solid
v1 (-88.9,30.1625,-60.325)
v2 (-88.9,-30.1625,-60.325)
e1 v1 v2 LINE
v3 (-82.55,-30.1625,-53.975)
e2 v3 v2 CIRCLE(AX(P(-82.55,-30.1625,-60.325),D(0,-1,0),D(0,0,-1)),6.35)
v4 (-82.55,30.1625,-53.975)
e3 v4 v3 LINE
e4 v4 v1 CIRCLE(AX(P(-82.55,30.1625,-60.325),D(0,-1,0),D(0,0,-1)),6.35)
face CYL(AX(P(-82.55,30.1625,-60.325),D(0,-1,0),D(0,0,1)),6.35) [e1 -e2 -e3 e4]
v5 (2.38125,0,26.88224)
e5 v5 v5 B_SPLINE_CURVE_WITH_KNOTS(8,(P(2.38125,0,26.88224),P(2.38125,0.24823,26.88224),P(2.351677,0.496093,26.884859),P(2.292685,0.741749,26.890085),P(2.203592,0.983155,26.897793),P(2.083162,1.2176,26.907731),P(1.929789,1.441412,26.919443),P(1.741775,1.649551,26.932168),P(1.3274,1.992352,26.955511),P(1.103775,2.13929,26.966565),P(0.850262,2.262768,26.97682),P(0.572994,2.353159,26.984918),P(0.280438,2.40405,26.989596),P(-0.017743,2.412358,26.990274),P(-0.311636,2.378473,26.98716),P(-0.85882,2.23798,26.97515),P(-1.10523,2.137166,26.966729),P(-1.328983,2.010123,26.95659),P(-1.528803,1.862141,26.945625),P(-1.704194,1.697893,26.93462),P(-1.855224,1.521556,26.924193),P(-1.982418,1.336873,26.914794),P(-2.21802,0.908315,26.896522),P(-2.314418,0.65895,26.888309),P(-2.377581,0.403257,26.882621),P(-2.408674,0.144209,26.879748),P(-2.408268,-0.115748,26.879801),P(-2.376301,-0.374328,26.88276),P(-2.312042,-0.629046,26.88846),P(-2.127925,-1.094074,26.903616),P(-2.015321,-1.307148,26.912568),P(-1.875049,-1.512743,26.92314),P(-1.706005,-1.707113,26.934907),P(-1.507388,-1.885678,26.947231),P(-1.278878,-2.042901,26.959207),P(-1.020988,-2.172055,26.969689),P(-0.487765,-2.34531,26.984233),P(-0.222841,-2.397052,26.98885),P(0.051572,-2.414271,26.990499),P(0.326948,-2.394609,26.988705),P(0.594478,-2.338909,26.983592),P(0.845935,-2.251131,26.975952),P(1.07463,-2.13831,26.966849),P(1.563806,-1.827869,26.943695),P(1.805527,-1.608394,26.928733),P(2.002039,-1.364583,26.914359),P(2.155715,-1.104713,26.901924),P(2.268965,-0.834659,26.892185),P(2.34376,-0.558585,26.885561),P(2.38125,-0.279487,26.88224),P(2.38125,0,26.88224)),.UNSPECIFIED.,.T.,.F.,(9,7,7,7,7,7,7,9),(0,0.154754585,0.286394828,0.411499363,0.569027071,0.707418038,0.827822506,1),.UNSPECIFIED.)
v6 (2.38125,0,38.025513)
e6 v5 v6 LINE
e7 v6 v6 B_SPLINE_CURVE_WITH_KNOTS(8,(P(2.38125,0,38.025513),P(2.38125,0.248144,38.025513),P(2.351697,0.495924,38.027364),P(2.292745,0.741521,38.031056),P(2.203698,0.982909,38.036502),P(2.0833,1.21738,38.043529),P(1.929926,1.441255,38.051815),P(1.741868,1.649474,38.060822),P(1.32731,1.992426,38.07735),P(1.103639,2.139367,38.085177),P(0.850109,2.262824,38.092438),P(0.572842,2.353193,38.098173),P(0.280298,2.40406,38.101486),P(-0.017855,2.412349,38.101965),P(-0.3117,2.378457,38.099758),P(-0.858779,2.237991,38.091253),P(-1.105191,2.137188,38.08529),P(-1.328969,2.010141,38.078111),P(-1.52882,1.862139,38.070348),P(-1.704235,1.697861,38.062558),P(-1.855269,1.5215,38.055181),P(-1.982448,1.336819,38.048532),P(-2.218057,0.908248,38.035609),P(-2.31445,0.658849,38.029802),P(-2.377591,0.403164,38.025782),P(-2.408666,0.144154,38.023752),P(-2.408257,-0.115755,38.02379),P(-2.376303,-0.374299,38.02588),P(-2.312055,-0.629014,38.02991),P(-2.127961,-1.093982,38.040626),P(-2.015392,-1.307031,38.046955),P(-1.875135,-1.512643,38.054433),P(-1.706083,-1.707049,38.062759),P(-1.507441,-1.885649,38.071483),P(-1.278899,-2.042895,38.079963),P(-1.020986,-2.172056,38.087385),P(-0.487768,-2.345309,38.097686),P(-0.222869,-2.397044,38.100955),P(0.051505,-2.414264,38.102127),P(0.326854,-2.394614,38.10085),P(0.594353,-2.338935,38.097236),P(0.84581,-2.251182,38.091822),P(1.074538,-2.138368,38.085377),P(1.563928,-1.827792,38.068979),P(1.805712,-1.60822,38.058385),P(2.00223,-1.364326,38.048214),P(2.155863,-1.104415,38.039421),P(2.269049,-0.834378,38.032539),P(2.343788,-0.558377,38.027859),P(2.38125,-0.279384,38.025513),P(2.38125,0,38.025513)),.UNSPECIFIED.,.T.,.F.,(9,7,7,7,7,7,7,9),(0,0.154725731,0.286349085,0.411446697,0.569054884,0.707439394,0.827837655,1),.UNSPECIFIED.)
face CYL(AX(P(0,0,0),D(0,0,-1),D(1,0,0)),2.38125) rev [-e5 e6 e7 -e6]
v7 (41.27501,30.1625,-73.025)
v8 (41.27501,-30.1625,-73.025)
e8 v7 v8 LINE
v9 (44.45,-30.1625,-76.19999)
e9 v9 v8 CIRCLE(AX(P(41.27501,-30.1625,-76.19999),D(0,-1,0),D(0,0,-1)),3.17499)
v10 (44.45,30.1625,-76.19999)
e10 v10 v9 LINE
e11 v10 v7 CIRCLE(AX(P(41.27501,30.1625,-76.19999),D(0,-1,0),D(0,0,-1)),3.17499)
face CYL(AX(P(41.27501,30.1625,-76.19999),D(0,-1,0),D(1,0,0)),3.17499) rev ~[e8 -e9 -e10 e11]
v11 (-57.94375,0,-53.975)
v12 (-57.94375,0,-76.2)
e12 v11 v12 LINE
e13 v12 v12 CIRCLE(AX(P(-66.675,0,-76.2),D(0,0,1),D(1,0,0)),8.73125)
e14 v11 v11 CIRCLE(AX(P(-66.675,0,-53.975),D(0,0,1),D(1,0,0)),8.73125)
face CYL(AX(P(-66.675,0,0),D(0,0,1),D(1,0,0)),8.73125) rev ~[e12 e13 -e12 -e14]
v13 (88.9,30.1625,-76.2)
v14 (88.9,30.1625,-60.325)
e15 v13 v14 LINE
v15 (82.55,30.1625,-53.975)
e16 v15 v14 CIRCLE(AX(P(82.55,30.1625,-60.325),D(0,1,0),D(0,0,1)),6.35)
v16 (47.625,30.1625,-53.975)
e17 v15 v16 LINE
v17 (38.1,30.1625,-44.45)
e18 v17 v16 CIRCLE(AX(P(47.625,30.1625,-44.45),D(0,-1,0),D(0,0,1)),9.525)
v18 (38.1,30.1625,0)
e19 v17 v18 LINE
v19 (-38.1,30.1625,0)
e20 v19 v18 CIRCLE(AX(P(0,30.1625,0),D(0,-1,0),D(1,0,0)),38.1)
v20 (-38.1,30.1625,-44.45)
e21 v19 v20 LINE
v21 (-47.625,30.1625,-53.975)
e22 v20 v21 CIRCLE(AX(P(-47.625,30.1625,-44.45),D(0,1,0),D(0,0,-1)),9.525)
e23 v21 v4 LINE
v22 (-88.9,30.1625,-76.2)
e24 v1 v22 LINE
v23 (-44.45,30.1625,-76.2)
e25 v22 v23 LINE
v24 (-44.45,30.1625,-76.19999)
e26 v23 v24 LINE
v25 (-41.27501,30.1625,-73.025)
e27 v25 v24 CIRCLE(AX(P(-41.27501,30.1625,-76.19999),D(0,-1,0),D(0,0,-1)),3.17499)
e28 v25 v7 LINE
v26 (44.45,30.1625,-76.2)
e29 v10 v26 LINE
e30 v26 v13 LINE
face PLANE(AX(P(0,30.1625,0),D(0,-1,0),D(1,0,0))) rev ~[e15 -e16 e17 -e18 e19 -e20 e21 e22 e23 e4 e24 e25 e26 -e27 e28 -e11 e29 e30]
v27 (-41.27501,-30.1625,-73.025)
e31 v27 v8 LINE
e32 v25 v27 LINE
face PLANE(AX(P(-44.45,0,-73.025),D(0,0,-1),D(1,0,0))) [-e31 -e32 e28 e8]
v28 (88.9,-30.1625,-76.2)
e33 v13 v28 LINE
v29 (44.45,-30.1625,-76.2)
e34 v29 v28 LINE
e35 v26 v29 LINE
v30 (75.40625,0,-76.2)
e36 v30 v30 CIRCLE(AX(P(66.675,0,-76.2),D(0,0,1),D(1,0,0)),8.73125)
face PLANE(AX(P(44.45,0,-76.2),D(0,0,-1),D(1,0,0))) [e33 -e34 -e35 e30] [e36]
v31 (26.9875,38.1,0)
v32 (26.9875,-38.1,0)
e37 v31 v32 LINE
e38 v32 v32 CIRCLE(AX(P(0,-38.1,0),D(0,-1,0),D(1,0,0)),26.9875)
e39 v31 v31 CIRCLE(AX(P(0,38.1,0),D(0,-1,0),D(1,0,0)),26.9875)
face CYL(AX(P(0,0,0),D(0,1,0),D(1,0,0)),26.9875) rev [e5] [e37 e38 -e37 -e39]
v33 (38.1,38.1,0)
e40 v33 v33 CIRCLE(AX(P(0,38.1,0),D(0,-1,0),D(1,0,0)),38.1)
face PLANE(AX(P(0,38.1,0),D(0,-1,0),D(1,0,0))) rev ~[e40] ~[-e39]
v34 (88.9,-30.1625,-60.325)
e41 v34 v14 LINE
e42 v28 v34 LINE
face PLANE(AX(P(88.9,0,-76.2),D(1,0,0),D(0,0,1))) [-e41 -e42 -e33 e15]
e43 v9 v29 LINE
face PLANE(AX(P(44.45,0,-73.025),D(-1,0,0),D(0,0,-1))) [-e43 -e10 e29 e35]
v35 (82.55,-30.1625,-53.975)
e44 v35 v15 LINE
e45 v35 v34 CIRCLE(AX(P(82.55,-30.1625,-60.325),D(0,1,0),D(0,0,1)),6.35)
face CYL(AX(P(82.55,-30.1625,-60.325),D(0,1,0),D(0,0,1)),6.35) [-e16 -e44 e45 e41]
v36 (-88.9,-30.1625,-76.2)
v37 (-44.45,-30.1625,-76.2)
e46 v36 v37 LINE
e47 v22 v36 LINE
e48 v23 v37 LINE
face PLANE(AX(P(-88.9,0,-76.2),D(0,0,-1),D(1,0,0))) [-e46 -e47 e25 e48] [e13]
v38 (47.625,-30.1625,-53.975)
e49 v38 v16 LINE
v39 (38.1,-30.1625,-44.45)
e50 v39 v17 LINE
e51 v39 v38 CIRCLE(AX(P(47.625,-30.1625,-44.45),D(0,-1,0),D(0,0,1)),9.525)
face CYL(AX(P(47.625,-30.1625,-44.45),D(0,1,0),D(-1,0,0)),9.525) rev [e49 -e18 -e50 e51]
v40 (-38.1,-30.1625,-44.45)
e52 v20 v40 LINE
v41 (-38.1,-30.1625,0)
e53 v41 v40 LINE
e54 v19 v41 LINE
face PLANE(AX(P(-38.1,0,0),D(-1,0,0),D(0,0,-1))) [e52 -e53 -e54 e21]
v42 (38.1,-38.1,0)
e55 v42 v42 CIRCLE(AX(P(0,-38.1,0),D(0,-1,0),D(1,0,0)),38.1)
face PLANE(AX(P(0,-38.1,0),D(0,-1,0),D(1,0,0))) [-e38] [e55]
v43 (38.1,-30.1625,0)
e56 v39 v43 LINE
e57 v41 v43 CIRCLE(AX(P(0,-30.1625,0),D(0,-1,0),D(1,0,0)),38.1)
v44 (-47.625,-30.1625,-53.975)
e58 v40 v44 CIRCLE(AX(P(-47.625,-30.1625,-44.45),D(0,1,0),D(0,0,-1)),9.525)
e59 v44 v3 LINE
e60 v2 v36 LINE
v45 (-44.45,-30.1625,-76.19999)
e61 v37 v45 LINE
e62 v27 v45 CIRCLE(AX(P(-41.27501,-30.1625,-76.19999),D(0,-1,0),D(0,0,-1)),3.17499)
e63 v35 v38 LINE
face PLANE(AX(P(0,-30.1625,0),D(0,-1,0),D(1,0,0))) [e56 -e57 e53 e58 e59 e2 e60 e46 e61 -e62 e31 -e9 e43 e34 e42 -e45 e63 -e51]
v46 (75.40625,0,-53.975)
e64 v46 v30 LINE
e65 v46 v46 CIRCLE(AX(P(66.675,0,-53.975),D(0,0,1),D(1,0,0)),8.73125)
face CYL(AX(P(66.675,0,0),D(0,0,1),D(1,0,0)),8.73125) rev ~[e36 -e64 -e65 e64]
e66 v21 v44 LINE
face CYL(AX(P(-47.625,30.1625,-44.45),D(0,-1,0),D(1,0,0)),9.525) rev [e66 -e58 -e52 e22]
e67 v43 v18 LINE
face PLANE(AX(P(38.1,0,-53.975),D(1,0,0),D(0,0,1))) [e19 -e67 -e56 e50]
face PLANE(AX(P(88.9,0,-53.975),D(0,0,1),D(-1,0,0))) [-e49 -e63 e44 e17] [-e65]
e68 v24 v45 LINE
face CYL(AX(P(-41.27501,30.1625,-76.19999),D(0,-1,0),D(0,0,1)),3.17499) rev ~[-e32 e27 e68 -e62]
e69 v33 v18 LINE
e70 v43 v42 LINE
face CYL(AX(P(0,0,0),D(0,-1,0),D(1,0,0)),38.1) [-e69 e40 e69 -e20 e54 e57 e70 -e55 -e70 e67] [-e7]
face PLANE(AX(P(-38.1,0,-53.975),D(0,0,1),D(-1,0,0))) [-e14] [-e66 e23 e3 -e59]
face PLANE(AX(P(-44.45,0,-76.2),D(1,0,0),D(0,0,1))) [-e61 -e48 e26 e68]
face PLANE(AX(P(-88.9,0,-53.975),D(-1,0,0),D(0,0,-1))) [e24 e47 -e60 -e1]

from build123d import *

# Parameters (mm, degrees)
F0_R     = 26.9875
F1_DEPTH = 38.1
F2_DEPTH = 30.1625
F3_R     = 8.73125
F4_DEPTH = 76.201
F5_R     = 2.38125
F6_DEPTH = 38.101
F7_R     = 9.525
F8_R     = 6.35
F9_R     = 3.17499


# Not quite as in the source:
# - a fillet or chamfer is up to 0.001 mm smaller than in the source, because OpenCascade refuses the exact size


with BuildPart() as f1:
    # F0 (on Front) → F1 (new body, symmetric)
    with BuildSketch(Plane.XZ):
        with BuildLine():
            ThreePointArc((-38.1, 0), (0, -38.1), (38.1, 0))
            ThreePointArc((38.1, 0), (0, 38.1), (-38.1, 0))
        make_face()
        Circle(F0_R, mode=Mode.SUBTRACT)
    extrude(amount=F1_DEPTH, both=True)

    # F0 (on Front) → F2 (join, symmetric)
    with BuildSketch(Plane.XZ):
        with BuildLine():
            ThreePointArc((-38.1, 0), (0, -38.1), (38.1, 0))
            ThreePointArc((38.1, 0), (0, 38.1), (-38.1, 0))
        make_face()
        Circle(F0_R, mode=Mode.SUBTRACT)
        with BuildLine():
            Line((38.1, -53.975), (38.1, 0))
            ThreePointArc((38.1, 0), (0, -38.1), (-38.1, 0))
            Line((-38.1, 0), (-38.1, -53.975))
            Line((-38.1, -53.975), (-88.9, -53.975))
            Line((-88.9, -53.975), (-88.9, -76.2))
            Line((-88.9, -76.2), (-44.45, -76.2))
            Line((-44.45, -76.2), (-44.45, -73.025))
            Line((-44.45, -73.025), (0, -73.025))
            Line((0, -73.025), (44.45, -73.025))
            Line((44.45, -73.025), (44.45, -76.2))
            Line((44.45, -76.2), (88.9, -76.2))
            Line((88.9, -76.2), (88.9, -53.975))
            Line((88.9, -53.975), (38.1, -53.975))
        make_face()
    extrude(amount=F2_DEPTH, both=True)

    # F3 (on Top) → F4 (cut, through all)
    with BuildSketch(Plane.XY):
        with Locations((-66.675, 0)):
            Circle(F3_R)
        with Locations((66.675, 0)):
            Circle(F3_R)
    extrude(amount=-F4_DEPTH, mode=Mode.SUBTRACT)

    # F5 (on Top) → F6 (cut, through all)
    with BuildSketch(Plane.XY):
        Circle(F5_R)
    extrude(amount=F6_DEPTH, mode=Mode.SUBTRACT)

    # F7
    f7_edges = [f1.edges().sort_by_distance(p)[0] for p in [
        (38.1, 0, -53.975),
        (-38.1, 0, -53.975),
    ]]
    fillet(f7_edges, radius=F7_R)

    # F8
    f8_edges = [f1.edges().sort_by_distance(p)[0] for p in [
        (-88.9, 0, -53.975),
        (88.9, 0, -53.975),
    ]]
    fillet(f8_edges, radius=F8_R)

    # F9 (radius 3.175 in the source; OpenCascade refuses exactly that, so slightly less here)
    f9_edges = [f1.edges().sort_by_distance(p)[0] for p in [
        (-44.45, 0, -73.025),
        (44.45, 0, -73.025),
    ]]
    fillet(f9_edges, radius=F9_R)


solid = f1.part
